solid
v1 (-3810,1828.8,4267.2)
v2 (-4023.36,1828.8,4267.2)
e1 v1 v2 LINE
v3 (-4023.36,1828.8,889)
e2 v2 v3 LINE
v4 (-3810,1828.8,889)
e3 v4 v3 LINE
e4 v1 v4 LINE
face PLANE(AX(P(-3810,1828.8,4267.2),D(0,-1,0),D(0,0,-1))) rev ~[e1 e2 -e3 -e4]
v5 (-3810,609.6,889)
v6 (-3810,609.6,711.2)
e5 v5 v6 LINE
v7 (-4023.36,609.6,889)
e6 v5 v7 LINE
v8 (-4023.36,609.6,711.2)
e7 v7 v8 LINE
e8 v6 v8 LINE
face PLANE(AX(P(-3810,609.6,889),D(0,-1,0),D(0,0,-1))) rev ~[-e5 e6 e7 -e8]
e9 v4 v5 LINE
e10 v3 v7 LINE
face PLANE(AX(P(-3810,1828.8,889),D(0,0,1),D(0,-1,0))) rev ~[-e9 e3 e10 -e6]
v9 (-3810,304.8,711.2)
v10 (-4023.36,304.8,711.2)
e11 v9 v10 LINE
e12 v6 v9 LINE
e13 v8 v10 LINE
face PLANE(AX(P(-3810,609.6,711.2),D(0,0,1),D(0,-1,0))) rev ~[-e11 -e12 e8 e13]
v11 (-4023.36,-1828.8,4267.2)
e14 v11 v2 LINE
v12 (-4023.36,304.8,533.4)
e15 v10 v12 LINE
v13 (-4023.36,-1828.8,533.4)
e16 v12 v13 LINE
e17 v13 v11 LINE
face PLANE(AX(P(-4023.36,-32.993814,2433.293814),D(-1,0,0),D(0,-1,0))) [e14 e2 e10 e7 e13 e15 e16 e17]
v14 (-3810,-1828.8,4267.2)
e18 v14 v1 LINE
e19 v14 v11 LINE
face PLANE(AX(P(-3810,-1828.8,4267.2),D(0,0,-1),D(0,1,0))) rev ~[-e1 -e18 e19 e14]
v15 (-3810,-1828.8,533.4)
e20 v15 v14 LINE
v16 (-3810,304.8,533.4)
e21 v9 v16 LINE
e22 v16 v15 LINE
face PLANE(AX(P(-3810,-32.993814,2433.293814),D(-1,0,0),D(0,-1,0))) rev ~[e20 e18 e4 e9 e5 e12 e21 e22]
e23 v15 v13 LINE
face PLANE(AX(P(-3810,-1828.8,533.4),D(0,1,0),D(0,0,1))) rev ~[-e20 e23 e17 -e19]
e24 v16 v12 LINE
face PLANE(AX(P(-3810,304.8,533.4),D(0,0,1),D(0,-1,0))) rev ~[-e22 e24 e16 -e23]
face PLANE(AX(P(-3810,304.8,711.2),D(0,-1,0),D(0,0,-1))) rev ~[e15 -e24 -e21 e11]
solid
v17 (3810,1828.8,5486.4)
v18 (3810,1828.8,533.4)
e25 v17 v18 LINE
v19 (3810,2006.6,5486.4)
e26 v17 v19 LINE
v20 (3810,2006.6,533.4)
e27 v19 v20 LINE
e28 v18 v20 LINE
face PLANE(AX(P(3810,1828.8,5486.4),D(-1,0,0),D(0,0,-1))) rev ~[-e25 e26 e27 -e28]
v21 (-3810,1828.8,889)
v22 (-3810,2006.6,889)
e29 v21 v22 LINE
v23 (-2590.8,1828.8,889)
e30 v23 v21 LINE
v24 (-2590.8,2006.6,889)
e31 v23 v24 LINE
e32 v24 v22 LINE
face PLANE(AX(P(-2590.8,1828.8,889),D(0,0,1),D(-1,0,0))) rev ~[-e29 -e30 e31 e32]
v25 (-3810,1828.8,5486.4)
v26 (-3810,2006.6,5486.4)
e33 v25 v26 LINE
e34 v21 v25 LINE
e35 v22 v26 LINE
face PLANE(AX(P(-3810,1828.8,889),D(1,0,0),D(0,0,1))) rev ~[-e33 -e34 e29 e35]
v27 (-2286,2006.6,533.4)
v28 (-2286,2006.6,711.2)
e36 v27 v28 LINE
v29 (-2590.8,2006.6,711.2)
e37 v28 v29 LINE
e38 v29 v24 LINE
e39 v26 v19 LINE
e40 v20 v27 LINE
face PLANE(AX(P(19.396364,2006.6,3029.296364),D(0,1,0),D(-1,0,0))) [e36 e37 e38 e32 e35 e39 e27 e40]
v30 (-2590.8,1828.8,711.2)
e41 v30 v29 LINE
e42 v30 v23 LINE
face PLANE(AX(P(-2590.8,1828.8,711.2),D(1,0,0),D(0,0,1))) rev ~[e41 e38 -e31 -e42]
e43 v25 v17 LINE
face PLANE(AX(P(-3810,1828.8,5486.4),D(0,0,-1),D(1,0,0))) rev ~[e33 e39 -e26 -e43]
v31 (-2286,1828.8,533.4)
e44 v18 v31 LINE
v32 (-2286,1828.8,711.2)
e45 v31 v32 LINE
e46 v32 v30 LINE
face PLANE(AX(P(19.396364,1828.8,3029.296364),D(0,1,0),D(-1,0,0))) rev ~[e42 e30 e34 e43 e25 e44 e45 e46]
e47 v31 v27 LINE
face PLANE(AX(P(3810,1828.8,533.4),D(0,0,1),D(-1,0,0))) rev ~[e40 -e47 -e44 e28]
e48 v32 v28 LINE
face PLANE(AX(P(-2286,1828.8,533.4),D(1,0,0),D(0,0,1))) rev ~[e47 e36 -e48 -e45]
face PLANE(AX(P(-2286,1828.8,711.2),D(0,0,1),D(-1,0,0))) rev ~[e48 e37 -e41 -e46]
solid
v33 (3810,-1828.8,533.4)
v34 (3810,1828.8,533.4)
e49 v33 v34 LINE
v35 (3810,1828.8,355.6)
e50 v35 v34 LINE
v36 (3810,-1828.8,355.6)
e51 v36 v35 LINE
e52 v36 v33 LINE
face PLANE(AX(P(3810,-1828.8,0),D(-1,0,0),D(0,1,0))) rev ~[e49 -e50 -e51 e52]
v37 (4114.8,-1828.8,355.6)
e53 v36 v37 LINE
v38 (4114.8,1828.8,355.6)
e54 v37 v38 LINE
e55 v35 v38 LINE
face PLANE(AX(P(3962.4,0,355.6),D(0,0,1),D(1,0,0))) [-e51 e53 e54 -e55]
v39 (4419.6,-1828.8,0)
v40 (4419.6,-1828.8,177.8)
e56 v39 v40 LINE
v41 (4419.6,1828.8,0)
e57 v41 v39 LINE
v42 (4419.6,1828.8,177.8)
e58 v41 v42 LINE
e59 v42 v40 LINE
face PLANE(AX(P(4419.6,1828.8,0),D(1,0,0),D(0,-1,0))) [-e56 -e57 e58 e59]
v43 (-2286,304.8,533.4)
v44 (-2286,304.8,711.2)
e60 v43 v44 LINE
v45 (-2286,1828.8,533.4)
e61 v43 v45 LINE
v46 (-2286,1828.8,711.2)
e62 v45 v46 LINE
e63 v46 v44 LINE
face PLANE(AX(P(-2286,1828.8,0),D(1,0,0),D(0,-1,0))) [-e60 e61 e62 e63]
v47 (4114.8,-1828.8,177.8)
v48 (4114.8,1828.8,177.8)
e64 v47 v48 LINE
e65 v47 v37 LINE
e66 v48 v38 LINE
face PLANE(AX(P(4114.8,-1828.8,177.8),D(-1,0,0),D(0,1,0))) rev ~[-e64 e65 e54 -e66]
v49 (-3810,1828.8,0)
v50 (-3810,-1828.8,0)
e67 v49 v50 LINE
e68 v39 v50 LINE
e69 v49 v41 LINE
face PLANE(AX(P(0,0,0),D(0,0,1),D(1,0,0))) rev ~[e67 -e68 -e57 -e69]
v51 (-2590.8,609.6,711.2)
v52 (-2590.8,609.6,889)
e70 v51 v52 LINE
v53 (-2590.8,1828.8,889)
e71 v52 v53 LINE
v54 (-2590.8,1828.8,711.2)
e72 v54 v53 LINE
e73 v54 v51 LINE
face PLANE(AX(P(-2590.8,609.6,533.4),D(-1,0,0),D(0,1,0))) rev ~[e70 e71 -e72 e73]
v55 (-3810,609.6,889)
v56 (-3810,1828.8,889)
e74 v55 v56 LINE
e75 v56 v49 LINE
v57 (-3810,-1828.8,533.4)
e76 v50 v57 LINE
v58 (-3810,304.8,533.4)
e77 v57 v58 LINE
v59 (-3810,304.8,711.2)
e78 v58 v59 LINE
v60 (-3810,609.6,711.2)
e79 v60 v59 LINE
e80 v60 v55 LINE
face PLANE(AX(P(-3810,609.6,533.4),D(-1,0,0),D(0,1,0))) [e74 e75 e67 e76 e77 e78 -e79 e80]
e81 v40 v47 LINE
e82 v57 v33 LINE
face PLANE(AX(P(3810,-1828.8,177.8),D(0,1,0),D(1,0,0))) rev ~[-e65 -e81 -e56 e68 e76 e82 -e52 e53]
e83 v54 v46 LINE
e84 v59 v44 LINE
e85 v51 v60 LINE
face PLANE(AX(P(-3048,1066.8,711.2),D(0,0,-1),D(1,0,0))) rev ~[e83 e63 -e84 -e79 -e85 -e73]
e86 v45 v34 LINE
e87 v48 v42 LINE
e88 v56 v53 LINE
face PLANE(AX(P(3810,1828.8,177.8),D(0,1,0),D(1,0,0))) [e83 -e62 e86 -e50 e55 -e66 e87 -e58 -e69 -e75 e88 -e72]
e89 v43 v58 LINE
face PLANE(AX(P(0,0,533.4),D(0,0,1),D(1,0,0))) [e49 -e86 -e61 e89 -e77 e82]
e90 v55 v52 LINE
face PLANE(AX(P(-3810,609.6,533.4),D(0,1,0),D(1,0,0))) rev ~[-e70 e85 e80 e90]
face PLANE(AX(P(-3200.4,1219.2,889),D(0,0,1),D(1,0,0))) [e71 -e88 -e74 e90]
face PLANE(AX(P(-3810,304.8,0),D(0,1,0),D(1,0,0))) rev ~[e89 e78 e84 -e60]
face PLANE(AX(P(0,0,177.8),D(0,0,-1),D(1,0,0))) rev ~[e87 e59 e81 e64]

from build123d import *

# Parameters (mm, degrees)
F0_W      = 7620
F0_H      = 3657.6
F1_DEPTH  = 533.4
F2_W      = 7620
F2_H      = 3657.6
F2_W_2    = 609.6
F3_DEPTH  = 177.8
F4_W      = 1219.2
F4_H      = 1219.2
F5_DEPTH  = 355.6
F6_W      = 1524
F6_H      = 1524
F7_DEPTH  = 711.2
F9_DEPTH  = 177.8
F11_DEPTH = 213.36
F12_W     = 304.8
F12_H     = 3657.6
F13_DEPTH = 177.8


with BuildPart() as f1:
    # F0 (on Top) → F1 (new body)
    with BuildSketch(Plane.XY):
        Rectangle(F0_W, F0_H)
    extrude(amount=F1_DEPTH)

    # F2 (on face) → F3 (join)
    with BuildSketch(Plane(origin=(0, 0, 0), x_dir=(1, 0, 0), z_dir=(0, 0, -1))):
        Rectangle(F2_W, F2_H)
        with Locations((4114.8, 0)):
            Rectangle(F2_W_2, F2_H)
    extrude(amount=-F3_DEPTH)

    # F4 (on face) → F5 (join)
    with BuildSketch(Plane.XY.offset(533.4)):
        with Locations((-3200.4, 1219.2)):
            Rectangle(F4_W, F4_H)
    extrude(amount=F5_DEPTH)

    # F6 (on face) → F7 (join)
    with BuildSketch(Plane(origin=(0, 0, 0), x_dir=(1, 0, 0), z_dir=(0, 0, -1))):
        with Locations((-3048, -1066.8)):
            Rectangle(F6_W, F6_H)
    extrude(amount=-F7_DEPTH)

    # F12 (on face) → F13 (join)
    with BuildSketch(Plane.XY.offset(177.8)):
        with Locations((3962.4, 0)):
            Rectangle(F12_W, F12_H)
    extrude(amount=F13_DEPTH)


with BuildPart() as f9:
    # F8 (on face) → F9 (new body)
    with BuildSketch(Plane(origin=(0, 1828.8, 0), x_dir=(-1, 0, 0), z_dir=(0, 1, 0))):
        Polygon((2590.8, 889), (3810, 889), (3810, 5486.4), (-3810, 5486.4), (-3810, 533.4), (2286, 533.4), (2286, 711.2), (2590.8, 711.2), align=None)
    extrude(amount=F9_DEPTH)


with BuildPart() as f11:
    # F10 (on face) → F11 (new body)
    with BuildSketch(Plane(origin=(-3810, 0, 0), x_dir=(0, -1, 0), z_dir=(-1, 0, 0))):
        Polygon((-1828.8, 4267.2), (-1828.8, 889), (-609.6, 889), (-609.6, 711.2), (-304.8, 711.2), (-304.8, 533.4), (1828.8, 533.4), (1828.8, 4267.2), align=None)
    extrude(amount=F11_DEPTH)


solid = Compound([f1.part, f9.part, f11.part])
